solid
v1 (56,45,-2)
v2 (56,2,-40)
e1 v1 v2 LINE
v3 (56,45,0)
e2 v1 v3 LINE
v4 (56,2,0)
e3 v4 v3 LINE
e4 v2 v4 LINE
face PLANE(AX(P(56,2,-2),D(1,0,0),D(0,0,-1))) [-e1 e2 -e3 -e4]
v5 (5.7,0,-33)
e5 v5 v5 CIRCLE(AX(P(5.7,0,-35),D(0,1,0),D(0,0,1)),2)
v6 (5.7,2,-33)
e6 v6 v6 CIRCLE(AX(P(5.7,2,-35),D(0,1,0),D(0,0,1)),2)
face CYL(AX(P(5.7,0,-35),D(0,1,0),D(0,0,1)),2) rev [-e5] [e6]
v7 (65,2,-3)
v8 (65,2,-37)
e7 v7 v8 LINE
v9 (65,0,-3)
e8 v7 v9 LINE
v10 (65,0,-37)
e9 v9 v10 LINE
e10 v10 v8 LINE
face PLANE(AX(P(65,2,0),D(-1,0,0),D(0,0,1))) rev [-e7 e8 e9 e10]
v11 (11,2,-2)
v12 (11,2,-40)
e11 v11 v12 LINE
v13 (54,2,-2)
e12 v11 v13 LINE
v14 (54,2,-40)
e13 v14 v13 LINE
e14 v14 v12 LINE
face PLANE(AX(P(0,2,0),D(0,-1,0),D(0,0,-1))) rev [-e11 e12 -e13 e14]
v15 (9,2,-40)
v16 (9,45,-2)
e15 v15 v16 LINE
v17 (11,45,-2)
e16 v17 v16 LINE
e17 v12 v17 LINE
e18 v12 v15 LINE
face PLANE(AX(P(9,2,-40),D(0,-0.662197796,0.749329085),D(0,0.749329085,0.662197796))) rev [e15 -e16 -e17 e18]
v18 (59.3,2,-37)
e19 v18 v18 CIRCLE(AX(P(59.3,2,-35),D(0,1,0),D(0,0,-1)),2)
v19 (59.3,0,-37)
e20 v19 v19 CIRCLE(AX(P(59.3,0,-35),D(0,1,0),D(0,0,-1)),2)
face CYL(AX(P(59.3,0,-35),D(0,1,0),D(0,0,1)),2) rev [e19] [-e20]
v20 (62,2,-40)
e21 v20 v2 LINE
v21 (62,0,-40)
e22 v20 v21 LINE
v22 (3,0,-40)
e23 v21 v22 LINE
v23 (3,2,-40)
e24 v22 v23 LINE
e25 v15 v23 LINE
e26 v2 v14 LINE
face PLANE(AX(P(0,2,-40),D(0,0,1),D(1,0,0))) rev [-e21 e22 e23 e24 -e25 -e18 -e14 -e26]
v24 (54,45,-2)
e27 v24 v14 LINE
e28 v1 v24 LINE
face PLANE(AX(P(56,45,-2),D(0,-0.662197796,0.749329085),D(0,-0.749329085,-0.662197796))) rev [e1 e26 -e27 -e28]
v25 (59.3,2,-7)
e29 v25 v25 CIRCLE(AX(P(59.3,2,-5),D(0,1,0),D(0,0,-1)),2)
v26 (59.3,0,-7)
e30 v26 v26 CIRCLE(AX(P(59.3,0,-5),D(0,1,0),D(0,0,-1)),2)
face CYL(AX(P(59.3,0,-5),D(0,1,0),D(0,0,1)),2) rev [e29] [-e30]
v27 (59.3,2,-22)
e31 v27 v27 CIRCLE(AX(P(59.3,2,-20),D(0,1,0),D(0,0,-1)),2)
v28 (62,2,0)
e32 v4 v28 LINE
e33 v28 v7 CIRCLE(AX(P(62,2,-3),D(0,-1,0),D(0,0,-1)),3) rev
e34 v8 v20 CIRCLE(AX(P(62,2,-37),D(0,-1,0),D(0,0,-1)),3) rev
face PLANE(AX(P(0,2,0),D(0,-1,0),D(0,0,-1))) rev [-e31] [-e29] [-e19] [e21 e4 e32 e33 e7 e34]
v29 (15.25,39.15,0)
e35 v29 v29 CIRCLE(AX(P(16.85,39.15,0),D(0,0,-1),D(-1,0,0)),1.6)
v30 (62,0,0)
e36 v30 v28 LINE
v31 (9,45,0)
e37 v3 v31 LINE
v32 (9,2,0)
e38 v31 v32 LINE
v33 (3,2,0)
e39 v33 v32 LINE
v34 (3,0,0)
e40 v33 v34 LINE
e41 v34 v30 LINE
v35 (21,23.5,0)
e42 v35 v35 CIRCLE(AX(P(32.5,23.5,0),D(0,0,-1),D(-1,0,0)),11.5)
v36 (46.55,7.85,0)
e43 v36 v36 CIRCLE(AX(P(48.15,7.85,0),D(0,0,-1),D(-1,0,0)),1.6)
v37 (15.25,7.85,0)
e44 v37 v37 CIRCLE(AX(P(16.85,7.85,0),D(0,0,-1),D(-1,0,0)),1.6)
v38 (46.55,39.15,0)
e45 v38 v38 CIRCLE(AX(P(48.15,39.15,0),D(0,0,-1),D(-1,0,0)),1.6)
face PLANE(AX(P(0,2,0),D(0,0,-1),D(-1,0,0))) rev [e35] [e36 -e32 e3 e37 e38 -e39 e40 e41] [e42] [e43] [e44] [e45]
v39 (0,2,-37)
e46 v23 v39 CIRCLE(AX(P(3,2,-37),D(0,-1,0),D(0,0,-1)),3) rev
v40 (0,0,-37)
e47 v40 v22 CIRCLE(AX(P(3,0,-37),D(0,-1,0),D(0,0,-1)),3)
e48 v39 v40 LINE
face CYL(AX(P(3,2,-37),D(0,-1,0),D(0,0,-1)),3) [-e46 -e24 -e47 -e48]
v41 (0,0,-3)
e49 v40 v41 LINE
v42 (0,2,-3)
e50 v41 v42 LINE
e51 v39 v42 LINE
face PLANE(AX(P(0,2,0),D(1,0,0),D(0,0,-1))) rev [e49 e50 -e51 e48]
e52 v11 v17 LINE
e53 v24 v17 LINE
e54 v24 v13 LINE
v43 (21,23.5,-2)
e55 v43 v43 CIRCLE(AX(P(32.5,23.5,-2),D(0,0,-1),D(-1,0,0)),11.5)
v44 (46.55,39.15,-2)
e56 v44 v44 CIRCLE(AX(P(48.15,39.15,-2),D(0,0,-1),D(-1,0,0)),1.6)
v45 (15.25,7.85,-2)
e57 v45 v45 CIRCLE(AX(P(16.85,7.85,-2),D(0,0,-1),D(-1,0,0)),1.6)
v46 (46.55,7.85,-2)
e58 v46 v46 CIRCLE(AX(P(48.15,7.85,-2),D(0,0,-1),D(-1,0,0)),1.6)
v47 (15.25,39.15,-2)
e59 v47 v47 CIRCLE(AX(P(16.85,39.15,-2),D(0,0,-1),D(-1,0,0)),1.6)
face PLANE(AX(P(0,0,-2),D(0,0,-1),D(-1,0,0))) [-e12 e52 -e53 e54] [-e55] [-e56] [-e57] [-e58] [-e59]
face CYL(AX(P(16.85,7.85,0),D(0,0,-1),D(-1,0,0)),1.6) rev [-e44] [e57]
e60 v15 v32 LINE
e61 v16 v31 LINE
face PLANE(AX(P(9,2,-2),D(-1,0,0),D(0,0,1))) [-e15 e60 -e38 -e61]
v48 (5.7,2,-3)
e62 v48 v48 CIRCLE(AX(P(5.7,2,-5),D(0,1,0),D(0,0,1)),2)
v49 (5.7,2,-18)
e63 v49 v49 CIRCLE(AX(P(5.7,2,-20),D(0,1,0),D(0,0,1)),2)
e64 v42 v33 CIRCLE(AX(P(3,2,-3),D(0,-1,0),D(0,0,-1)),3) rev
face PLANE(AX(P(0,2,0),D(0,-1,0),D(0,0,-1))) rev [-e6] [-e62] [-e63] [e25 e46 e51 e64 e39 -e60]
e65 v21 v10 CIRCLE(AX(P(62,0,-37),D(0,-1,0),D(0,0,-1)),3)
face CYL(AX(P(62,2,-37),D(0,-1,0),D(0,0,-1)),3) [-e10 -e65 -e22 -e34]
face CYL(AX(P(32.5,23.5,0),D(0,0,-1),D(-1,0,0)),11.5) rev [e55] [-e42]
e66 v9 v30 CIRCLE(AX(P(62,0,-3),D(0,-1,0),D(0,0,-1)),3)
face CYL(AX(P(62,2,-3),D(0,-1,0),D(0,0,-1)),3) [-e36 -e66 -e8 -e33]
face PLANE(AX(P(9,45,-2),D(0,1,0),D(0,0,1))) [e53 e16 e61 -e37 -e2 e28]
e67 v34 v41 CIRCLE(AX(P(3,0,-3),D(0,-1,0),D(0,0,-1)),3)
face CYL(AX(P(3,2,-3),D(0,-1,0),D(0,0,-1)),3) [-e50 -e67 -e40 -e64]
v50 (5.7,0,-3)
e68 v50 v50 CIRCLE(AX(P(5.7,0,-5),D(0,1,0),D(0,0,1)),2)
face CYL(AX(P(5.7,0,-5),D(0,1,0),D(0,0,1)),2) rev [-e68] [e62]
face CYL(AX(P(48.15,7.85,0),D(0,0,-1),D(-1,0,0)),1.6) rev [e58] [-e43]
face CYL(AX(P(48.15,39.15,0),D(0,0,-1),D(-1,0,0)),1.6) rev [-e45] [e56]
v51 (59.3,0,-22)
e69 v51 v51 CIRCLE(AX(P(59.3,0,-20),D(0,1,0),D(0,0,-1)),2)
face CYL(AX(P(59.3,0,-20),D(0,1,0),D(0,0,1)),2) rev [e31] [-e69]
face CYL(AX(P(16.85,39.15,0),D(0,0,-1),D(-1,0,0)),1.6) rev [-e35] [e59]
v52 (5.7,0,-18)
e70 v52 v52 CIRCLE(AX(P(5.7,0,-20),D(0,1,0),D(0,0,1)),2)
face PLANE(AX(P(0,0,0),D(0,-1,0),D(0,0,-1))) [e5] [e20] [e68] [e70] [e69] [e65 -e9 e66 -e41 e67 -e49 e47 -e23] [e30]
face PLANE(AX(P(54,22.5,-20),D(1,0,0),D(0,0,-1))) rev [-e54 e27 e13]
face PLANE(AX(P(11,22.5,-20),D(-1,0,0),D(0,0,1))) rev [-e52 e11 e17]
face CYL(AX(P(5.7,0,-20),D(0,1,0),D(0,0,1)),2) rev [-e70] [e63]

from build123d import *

# Parameters (mm, degrees)
SKETCH_1_W          = 65
SKETCH_1_H          = 40
EXTRUDE_1_DEPTH     = 2
SKETCH_2_R          = 2
CUT_EXTRUDE_1_DEPTH = 77.347887987
SKETCH_3_W          = 47
SKETCH_3_H          = 43
EXTRUDE_2_DEPTH     = 2
RIB_1_REACH         = 84.225
SKETCH_5_WALL_W     = 223.835267426
SKETCH_5_WALL_H     = 2
RIB_2_REACH         = 84.225
SKETCH_6_WALL_W     = 223.835267426
SKETCH_6_WALL_H     = 2
SKETCH_7_R          = 11.5
SKETCH_7_R_2        = 1.6
CUT_EXTRUDE_2_DEPTH = 88.715449038
FILLET_1_R          = 3


with BuildPart() as part:
    # 草图1 → 凸台-拉伸1 (new body)
    with BuildSketch(Plane(origin=(0, 0, 0), x_dir=(1, 0, 0), z_dir=(0, 1, 0))):
        with Locations((32.5, 20)):
            Rectangle(SKETCH_1_W, SKETCH_1_H)
    extrude(amount=EXTRUDE_1_DEPTH)

    # 草图2 → 切除-拉伸1 (cut, through all)
    with BuildSketch(Plane(origin=(0, 2, 0), x_dir=(1, 0, 0), z_dir=(0, 1, 0))):
        with Locations((5.7, 5)):
            Circle(SKETCH_2_R)
        with Locations((5.7, 20)):
            Circle(SKETCH_2_R)
        with Locations((5.7, 35)):
            Circle(SKETCH_2_R)
        with Locations((59.3, 5)):
            Circle(SKETCH_2_R)
        with Locations((59.3, 20)):
            Circle(SKETCH_2_R)
        with Locations((59.3, 35)):
            Circle(SKETCH_2_R)
    extrude(amount=-CUT_EXTRUDE_1_DEPTH, mode=Mode.SUBTRACT)

    # 草图3 → 凸台-拉伸2 (add)
    with BuildSketch(Plane.XY):
        with Locations((32.5, 23.5)):
            Rectangle(SKETCH_3_W, SKETCH_3_H)
    extrude(amount=-EXTRUDE_2_DEPTH)

    # 草图5 wall → 筋1 (add, up to next)
    with BuildSketch(Plane(origin=(9, 23.5, -21), x_dir=(0, 0.749329085481, 0.662197796472), z_dir=(0, 0.662197796472, -0.749329085481)), mode=Mode.PRIVATE) as rib_1_sk1:
        with Locations((0, 1)):
            Rectangle(SKETCH_5_WALL_W, SKETCH_5_WALL_H)
    rib_1_tool1 = extrude(rib_1_sk1.sketch, amount=-RIB_1_REACH, mode=Mode.PRIVATE) - part.part
    add(rib_1_tool1.solids().sort_by_distance((9, 23.5, -21))[0])

    # 草图6 wall → 筋2 (add, up to next)
    with BuildSketch(Plane(origin=(56, 23.5, -21), x_dir=(0, -0.749329085481, -0.662197796472), z_dir=(0, 0.662197796472, -0.749329085481)), mode=Mode.PRIVATE) as rib_2_sk1:
        with Locations((0, 1)):
            Rectangle(SKETCH_6_WALL_W, SKETCH_6_WALL_H)
    rib_2_tool1 = extrude(rib_2_sk1.sketch, amount=-RIB_2_REACH, mode=Mode.PRIVATE) - part.part
    add(rib_2_tool1.solids().sort_by_distance((56, 23.5, -21))[0])

    # 草图7 → 切除-拉伸2 (cut, through all)
    with BuildSketch(Plane(origin=(0, 0, -2), x_dir=(-1, 0, 0), z_dir=(0, 0, -1))):
        with Locations((-32.5, 23.5)):
            Circle(SKETCH_7_R)
        with Locations((-48.15, 7.85)):
            Circle(SKETCH_7_R_2)
        with Locations((-16.85, 7.85)):
            Circle(SKETCH_7_R_2)
        with Locations((-16.85, 39.15)):
            Circle(SKETCH_7_R_2)
        with Locations((-48.15, 39.15)):
            Circle(SKETCH_7_R_2)
    extrude(amount=-CUT_EXTRUDE_2_DEPTH, mode=Mode.SUBTRACT)

    # 圆角1
    fillet_1_edges = [part.edges().sort_by_distance(p)[0] for p in [
        (65, 1, -40),
        (65, 1, 0),
        (0, 1, -40),
        (0, 1, 0),
    ]]
    fillet(fillet_1_edges, radius=FILLET_1_R)


solid = part.part
